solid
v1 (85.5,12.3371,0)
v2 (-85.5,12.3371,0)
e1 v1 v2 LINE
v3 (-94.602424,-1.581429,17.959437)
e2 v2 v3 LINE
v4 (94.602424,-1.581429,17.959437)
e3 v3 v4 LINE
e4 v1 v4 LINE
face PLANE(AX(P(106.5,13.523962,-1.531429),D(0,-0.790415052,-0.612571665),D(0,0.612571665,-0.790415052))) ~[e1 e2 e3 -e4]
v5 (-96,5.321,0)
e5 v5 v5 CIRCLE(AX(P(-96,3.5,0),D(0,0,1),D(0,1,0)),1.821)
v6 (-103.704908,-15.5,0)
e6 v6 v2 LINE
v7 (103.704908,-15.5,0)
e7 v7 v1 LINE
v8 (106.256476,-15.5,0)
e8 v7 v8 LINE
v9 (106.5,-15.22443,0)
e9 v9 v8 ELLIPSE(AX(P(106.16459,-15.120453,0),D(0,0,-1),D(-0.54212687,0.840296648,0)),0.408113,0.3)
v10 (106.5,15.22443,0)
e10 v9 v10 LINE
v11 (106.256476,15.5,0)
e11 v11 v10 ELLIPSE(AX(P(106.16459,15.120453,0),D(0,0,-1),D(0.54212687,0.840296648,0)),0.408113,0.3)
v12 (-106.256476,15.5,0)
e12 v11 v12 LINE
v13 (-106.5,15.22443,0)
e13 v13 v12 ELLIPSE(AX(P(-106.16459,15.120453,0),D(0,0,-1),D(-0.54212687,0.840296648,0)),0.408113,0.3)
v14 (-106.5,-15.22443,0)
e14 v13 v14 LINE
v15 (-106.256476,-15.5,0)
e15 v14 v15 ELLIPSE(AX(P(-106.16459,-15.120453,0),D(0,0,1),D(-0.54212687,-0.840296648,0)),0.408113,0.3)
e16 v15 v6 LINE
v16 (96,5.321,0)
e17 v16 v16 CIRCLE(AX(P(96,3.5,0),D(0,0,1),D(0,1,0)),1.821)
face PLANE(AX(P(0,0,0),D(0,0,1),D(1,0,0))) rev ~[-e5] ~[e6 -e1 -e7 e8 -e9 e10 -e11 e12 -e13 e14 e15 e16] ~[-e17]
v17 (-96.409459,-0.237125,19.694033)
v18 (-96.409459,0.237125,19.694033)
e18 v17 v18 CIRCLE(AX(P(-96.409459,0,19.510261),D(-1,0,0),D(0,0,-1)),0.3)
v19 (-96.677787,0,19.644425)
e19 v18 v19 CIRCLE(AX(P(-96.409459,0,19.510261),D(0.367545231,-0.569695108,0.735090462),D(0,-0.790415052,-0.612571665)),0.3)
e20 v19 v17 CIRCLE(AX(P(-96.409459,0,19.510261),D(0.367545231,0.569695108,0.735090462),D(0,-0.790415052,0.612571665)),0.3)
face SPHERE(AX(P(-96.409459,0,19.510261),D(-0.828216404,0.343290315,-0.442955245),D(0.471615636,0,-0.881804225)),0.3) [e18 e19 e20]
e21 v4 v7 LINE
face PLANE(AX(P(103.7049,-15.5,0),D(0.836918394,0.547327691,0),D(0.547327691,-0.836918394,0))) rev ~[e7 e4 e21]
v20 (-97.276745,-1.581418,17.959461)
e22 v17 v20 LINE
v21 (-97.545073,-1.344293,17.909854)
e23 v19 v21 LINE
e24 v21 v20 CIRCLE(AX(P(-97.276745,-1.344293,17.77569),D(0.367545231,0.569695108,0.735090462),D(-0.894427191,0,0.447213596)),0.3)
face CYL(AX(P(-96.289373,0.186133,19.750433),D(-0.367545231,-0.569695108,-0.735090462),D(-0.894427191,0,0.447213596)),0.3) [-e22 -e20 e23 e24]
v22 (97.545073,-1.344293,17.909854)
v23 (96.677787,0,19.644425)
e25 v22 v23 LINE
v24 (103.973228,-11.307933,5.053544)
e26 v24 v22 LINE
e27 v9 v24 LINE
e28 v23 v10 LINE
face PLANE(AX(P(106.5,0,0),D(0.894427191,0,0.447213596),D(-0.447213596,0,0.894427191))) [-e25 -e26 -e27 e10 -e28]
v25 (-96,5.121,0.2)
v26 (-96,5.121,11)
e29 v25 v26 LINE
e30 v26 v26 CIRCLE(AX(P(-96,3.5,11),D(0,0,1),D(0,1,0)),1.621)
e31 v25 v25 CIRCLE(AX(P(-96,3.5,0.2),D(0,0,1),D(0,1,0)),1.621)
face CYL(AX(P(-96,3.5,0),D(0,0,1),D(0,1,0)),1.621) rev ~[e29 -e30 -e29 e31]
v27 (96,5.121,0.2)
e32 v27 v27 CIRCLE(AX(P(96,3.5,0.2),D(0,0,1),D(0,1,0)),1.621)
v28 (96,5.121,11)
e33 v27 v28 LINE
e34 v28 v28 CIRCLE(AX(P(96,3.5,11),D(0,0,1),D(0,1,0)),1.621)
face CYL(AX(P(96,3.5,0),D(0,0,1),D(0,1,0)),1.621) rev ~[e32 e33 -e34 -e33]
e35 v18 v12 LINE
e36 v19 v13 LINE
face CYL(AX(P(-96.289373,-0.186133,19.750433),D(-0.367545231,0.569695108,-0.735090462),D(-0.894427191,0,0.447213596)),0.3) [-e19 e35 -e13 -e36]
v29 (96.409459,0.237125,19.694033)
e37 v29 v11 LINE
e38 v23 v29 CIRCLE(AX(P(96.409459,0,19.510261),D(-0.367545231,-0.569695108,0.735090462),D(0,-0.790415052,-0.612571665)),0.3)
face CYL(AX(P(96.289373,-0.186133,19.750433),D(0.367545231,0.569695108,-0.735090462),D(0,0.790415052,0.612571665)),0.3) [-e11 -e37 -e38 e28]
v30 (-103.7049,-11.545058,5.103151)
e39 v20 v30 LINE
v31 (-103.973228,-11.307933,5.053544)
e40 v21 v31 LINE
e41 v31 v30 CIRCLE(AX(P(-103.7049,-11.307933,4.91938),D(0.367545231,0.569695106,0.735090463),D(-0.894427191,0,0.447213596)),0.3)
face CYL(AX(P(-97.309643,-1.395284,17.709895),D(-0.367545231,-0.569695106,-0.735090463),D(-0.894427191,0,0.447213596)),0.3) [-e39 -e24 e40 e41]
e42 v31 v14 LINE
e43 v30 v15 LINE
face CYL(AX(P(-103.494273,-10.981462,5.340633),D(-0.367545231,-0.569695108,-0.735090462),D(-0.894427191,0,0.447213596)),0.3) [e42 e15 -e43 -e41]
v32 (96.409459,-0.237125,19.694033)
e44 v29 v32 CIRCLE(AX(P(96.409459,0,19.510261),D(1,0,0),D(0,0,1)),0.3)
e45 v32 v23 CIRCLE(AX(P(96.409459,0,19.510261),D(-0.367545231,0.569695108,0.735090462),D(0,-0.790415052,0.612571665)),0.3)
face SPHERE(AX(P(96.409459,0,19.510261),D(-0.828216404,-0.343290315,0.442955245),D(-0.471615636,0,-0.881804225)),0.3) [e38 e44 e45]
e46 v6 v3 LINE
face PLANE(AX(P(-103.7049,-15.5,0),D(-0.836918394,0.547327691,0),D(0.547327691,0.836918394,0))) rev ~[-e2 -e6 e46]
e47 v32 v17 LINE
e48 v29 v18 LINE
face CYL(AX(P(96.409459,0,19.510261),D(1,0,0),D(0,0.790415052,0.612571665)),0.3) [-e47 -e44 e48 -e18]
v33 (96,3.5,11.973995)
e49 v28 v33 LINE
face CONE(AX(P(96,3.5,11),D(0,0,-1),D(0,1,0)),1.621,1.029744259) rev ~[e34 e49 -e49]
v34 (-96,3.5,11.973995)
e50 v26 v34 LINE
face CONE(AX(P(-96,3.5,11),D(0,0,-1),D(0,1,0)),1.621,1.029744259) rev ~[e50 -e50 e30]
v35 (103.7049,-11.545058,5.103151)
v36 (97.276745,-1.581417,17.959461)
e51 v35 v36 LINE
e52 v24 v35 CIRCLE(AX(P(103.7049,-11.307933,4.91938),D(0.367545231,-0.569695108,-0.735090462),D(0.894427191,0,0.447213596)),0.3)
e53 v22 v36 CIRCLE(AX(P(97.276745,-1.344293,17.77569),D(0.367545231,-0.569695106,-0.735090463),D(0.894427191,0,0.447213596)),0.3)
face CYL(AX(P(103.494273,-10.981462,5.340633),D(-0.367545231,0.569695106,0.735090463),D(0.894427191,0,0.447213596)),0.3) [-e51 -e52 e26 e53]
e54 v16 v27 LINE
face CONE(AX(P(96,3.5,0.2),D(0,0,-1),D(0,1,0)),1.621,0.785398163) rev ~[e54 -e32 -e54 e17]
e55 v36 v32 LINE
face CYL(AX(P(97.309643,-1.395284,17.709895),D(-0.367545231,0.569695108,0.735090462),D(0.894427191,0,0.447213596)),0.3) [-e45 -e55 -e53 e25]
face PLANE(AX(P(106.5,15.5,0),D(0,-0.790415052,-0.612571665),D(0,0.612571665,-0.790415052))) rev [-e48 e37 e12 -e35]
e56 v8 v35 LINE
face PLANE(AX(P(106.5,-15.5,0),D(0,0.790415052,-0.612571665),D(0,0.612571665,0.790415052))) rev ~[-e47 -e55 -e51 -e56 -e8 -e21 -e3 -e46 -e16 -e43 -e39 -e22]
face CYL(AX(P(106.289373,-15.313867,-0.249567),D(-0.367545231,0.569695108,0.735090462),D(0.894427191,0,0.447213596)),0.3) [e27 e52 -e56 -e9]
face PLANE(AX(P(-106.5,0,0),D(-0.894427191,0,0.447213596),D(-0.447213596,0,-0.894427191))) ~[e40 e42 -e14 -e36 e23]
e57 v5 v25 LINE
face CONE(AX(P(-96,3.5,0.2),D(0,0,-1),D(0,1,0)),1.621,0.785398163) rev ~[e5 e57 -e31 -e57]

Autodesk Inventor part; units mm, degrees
ref_plane "YZ Plane" through (0, 0, 0) normal (1, 0, 0) x (0, 1, 0)
ref_plane "XZ Plane" through (0, 0, 0) normal (0, 1, 0) x (-1, 0, 0)
ref_plane "XY Plane" through (0, 0, 0) normal (0, 0, 1) x (1, 0, 0)
sketch "Sketch1" plane through (0, 0, 0) normal (0, 0, 1) x (1, 0, 0)
  line L0 (-106.5, -15.5) -> (106.5, -15.5)
  line L1 (106.5, -15.5) -> (106.5, 15.5)
  line L2 (106.5, 15.5) -> (-106.5, 15.5)
  line L3 (-106.5, 15.5) -> (-106.5, -15.5)
  line L4 (-106.5, -15.5) -> (106.5, 15.5) construction
  line L5 (106.5, -15.5) -> (-106.5, 15.5) construction
  point P0 (0, 0)
  dimension "L" = 213
  dimension "d1" = 31
extrude "Extrusion1" add sketch "Sketch1" along normal blind 20
sketch "Sketch2" plane through (106.5, -15.5, 0) normal (1, 0, 0) x (0, 0, -1)
  line L0 (0, 0) -> (-20, 0) projected
  line L1 (0, 0) -> (-20, 15.5)
  line L2 (-20, 0) -> (-20, 31) projected
  point P0 (0, 15.5)
extrude "Extrusion2" cut sketch "Sketch2" against normal through all
mirror "Mirror1" about plane through (0, 0, 0) normal (0, 1, 0) of "Extrusion2"
sketch "Sketch3" plane through (0, 0, 0) normal (0, 1, 0) x (-1, 0, 0)
  line L0 (106.5, 0) -> (-106.5, 0) projected
  line L1 (-106.5, 0) -> (-96.5, 20)
  line L2 (106.5, 20) -> (-106.5, 20) projected
  line L3 (-106.5, 0) -> (-106.5, 20) projected
  point P0 (0, 0)
  dimension "d6" = 10
extrude "Extrusion3" cut sketch "Sketch3" along normal through all both and the other way through all
mirror "Mirror2" about plane through (0, 0, 0) normal (1, 0, 0) of "Extrusion3"
shell "Shell1" thickness 2.5 removed faces 2 at (-32.1667, -10.3333, 6.6667) at (35.5, -5.1667, 0)
sketch "Sketch4" plane through (0, 0, 0) normal (0, 0, 1) x (1, 0, 0)
  line L0 (-106.5, -15.5) -> (-103.7049, -15.5) projected
  line L1 (-103.7049, -15.5) -> (-85.5, 12.3371)
  line L2 (103.7049, 12.3371) -> (-103.7049, 12.3371) projected
  line L3 (-106.5, 15.5) -> (-106.5, -15.5) projected
  line L4 (-103.7049, 12.3371) -> (-103.7049, -15.5) projected
  point P0 (0, 0)
  dimension "d10" = 21
extrude "Extrusion4" add sketch "Sketch4" along normal up to surface surface through (106.5, -1.976, 18.4686) normal (0, -0.7904151, -0.6125717)
ref_plane "Work Plane1" through (-106.5, -15.5, 0) normal (-0.8944272, 0, 0.4472136) x (0.4472136, 0, 0.8944272)
split "Split1" plane through (-106.5, -15.5, 0) removes the side toward (-0.8944272, 0, 0.4472136)
ref_plane "Work Plane2" through (-96.5, 0, 20) normal (0, -0.7904151, 0.6125717) x (1, 0, 0)
split "Split2" plane through (-96.5, 0, 20) removes the side toward (0, -0.7904151, 0.6125717)
mirror "Mirror3" about plane through (0, 0, 0) normal (1, 0, 0) of "Extrusion4", "Split1", "Split2"
fillet "Fillet1" radius 0.3 4 edges at (-101.5, 7.75, 10) (-101.5, -7.75, 10) (101.5, 7.75, 10) (101.5, -7.75, 10)
fillet "Fillet2" radius 0.3 3 edges at (96.4817, 0, 19.9011) (-96.4817, 0, 19.9011) (0, 0, 20)
sketch "Sketch5" plane through (0, 0, 0) normal (0, 0, -1) x (-1, 0, 0)
  line L0 (-96, 3.5) -> (96, 3.5)
  line L1 (-106.2565, 15.5) -> (106.2565, 15.5) projected
  point P0 (0, 0)
  point P1 (0, 3.5)
  dimension "d17" = 12
  dimension "BC" = 192
hole "Hole1" at (96, 3.5, 0) at (-96, 3.5, 0) direction (0, 0, 1) diameter 3.242 depth 11 tip angle 118 thread size "M4x0.7" class "6H" standard "ISO Metric profile"
chamfer "Chamfer1" distance 0.2 angle 45 2 edges at (96, 1.879, 0) (-96, 1.879, 0)
ref_plane "Work Plane3" through (106.5, -15.5, 0) normal (-0.8944272, 0, -0.4472136) x (-0.4472136, 0, 0.8944272)
properties part number "ESTAMP Post 6832 Gold L=149; BC=128" material "Zinc"
